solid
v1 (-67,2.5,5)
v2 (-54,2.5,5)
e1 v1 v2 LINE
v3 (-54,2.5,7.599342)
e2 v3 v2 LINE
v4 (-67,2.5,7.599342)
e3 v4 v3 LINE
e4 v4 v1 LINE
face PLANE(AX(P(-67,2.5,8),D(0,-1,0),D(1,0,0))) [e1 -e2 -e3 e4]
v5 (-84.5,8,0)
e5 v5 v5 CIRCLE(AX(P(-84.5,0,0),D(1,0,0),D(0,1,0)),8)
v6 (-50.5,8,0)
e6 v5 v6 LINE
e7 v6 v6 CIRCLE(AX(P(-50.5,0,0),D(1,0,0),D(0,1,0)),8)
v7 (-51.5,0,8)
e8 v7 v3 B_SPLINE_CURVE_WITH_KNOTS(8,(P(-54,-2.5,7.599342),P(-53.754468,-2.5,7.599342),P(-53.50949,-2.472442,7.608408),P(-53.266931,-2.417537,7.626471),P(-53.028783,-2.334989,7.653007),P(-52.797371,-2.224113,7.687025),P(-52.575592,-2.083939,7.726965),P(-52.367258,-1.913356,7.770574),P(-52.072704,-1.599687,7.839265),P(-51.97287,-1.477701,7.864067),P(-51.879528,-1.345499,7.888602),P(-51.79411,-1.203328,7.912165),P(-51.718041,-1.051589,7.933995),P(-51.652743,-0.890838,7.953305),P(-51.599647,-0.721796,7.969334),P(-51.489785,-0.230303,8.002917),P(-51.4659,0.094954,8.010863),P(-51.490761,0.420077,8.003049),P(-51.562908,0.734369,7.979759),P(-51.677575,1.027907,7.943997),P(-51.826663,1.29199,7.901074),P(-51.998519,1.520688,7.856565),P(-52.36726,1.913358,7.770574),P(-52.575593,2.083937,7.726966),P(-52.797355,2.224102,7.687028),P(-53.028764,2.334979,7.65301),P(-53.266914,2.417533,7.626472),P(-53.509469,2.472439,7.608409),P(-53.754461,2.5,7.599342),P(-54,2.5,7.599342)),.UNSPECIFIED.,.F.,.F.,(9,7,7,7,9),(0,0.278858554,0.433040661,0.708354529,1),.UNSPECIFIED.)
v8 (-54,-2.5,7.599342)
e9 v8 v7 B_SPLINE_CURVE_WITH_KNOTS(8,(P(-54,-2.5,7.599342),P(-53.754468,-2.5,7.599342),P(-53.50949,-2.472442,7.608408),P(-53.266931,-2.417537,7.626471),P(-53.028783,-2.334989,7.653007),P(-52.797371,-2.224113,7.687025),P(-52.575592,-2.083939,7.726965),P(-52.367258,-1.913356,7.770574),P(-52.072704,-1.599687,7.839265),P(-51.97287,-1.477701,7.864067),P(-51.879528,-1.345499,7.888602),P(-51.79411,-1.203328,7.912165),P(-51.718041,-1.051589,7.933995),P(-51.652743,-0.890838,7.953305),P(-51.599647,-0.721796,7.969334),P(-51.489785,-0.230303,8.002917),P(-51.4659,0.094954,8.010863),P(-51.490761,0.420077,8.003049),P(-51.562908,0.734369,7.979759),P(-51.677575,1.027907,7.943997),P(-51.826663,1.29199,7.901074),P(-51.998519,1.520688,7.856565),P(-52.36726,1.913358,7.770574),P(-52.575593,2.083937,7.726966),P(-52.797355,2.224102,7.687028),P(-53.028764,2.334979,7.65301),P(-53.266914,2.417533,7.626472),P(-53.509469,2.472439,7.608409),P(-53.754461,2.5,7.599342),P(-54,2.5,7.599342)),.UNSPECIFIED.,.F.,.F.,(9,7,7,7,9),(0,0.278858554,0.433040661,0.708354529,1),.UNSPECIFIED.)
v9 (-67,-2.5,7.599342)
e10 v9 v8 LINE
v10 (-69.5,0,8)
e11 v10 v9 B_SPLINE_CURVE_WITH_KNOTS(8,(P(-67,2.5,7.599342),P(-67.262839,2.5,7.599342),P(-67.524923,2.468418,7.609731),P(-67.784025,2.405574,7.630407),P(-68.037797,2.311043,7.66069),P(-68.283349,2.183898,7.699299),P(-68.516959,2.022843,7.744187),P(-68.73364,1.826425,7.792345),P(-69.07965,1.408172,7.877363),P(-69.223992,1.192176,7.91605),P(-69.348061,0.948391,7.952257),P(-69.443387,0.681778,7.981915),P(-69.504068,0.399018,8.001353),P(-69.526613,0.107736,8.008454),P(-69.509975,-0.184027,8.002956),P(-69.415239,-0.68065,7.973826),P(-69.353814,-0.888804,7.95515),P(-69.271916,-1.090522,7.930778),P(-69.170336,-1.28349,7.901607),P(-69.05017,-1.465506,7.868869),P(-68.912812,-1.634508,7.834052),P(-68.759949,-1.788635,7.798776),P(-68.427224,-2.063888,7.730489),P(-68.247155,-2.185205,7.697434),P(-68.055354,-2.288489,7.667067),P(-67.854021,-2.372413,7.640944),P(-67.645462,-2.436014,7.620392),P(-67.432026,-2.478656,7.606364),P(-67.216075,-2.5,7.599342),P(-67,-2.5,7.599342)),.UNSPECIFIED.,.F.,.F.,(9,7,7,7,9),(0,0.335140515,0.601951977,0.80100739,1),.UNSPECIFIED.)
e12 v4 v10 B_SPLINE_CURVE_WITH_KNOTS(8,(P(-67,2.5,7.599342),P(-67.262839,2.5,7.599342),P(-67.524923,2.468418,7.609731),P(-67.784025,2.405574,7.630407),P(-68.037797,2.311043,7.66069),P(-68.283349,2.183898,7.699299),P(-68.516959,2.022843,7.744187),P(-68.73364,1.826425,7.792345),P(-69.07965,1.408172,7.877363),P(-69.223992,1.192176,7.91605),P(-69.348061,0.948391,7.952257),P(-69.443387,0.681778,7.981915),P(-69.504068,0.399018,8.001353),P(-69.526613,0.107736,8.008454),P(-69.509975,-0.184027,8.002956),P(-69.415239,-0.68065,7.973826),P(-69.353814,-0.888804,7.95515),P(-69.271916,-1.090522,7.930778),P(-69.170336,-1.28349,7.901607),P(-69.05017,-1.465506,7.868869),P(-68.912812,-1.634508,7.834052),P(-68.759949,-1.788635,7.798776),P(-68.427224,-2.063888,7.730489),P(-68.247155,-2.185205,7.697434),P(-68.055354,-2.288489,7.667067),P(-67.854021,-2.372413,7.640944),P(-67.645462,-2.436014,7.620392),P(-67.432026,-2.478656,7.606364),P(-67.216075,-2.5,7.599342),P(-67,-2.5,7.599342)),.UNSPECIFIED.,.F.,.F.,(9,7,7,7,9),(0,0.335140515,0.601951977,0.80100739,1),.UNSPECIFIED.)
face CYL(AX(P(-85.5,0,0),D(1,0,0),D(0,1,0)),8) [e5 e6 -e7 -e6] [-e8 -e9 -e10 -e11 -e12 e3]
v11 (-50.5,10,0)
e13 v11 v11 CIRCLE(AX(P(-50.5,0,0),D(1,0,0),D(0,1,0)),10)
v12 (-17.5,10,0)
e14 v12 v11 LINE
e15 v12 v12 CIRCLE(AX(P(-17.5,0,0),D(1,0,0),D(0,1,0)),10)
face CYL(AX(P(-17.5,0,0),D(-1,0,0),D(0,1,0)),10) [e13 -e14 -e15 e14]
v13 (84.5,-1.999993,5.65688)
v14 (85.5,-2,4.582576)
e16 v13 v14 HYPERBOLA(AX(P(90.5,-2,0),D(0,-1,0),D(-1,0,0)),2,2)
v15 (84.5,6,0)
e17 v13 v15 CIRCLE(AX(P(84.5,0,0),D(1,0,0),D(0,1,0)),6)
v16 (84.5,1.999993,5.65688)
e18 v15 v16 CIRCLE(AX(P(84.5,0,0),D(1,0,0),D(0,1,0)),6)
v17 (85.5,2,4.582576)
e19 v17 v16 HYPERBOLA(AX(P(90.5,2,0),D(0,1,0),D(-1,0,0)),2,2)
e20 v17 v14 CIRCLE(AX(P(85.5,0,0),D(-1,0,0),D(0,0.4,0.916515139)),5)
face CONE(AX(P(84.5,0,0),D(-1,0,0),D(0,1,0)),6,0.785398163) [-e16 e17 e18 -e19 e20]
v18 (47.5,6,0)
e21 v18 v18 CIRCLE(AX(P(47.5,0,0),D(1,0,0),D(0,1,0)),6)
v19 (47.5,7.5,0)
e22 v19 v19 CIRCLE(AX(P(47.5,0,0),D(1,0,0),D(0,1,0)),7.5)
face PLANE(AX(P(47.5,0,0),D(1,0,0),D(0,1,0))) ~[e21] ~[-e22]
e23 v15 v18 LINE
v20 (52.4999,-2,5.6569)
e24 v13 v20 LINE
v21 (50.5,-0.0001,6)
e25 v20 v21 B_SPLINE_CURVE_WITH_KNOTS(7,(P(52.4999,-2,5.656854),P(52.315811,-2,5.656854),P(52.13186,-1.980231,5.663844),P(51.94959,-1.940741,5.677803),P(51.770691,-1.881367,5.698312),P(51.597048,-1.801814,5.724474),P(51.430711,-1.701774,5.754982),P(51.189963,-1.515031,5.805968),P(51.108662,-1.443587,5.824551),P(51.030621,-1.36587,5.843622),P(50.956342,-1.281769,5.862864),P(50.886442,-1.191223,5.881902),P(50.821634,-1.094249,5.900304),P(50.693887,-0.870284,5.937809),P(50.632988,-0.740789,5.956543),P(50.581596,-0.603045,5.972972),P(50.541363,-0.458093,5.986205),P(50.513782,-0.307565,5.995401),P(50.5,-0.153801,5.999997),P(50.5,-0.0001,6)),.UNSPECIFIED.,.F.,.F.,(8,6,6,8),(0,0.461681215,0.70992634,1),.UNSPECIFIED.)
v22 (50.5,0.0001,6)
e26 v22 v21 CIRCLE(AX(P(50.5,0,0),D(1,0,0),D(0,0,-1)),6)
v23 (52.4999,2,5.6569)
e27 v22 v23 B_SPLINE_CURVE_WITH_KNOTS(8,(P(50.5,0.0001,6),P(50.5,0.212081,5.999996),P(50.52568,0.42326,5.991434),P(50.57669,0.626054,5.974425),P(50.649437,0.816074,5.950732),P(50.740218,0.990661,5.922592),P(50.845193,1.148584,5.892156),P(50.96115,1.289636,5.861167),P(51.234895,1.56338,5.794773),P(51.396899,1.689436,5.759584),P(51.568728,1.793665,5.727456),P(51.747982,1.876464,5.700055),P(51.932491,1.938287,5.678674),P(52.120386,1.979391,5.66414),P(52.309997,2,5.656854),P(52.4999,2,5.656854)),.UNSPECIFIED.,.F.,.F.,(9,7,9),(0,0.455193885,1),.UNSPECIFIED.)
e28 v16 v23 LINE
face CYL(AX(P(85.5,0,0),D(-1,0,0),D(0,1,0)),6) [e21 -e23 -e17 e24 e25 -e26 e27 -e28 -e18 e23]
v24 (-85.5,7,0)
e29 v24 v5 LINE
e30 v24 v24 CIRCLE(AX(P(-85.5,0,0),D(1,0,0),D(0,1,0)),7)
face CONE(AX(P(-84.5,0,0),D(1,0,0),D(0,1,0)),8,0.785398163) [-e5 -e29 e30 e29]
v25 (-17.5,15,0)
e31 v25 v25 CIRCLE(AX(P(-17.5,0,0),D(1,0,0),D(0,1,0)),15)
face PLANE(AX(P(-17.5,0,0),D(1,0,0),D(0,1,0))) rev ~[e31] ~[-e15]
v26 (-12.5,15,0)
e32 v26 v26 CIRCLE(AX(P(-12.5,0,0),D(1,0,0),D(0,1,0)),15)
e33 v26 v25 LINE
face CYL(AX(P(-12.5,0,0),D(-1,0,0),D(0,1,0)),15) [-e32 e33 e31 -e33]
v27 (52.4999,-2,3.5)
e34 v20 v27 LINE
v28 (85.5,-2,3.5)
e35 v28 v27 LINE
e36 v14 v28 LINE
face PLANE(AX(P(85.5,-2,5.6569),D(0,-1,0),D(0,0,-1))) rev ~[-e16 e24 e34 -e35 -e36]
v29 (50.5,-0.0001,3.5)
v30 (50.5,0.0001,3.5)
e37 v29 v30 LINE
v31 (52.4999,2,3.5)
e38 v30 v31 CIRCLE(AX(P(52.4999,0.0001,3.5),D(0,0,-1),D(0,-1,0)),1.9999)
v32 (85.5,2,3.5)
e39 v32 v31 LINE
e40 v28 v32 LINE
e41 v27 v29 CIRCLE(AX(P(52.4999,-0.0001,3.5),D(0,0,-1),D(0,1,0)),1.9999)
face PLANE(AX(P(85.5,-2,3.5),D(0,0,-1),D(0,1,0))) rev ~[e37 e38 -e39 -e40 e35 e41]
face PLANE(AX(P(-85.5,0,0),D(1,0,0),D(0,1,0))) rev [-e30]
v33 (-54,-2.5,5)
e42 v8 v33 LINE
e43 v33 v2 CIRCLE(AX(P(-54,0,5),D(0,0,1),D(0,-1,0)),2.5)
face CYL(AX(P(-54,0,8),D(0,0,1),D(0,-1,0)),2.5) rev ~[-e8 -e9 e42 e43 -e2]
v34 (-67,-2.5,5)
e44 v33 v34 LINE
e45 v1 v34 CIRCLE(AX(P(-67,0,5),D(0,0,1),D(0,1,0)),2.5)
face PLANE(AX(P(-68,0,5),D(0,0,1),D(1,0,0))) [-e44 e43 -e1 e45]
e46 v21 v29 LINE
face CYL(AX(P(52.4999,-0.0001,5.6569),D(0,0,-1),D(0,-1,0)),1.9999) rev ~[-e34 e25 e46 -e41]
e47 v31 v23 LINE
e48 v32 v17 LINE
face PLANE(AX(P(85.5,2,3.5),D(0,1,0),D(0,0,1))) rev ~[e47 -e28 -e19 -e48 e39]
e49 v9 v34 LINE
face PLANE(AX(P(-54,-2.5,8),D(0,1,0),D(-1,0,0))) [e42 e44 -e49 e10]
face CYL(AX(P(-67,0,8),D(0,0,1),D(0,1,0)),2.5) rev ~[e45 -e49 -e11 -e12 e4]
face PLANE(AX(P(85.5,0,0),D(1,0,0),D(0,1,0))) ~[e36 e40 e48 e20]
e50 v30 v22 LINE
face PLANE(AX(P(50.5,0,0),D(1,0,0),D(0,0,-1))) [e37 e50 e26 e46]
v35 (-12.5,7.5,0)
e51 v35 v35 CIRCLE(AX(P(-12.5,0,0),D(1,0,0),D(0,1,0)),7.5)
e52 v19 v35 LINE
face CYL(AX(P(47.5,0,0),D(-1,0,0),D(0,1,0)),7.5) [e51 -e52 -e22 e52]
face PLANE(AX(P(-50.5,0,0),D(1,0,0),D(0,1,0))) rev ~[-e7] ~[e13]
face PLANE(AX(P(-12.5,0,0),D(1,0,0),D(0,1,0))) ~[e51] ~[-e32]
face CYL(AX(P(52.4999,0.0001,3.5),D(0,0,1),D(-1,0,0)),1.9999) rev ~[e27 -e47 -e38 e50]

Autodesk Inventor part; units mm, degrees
ref_plane "YZ Plane" through (0, 0, 0) normal (1, 0, 0) x (0, 1, 0)
ref_plane "XZ Plane" through (0, 0, 0) normal (0, 1, 0) x (-1, 0, 0)
sketch "Sketch1" plane through (0, 0, 0) normal (0, 0, 1) x (1, 0, 0)
  line L0 (-85.5, 0) -> (85.5, 0)
  line L1 (85.5, 0) -> (85.5, 6)
  line L2 (85.5, 6) -> (47.5, 6)
  line L3 (47.5, 6) -> (47.5, 7.5)
  line L4 (47.5, 7.5) -> (-12.5, 7.5)
  line L5 (-12.5, 7.5) -> (-12.5, 15)
  line L6 (-12.5, 15) -> (-17.5, 15)
  line L7 (-17.5, 15) -> (-17.5, 10)
  line L8 (-17.5, 10) -> (-50.5, 10)
  line L9 (-85.5, 0) -> (-85.5, 8)
  line L10 (-85.5, 8) -> (-50.5, 8)
  line L11 (-50.5, 10) -> (-50.5, 8)
  point P0 (0, 0)
  point P1 (0, 0)
  dimension "d8" = 12
  dimension "d9" = 15
  dimension "d10" = 30
  dimension "d11" = 20
  dimension "d12" = 98
  dimension "d13" = 5
  dimension "d14" = 60
  dimension "d15" = 33
  dimension "d16" = 16
  dimension "d43" = 68
revolve "Revolution1" add sketch "Sketch1" angle 360 about axis through (-85.5, 0, 0) along (1, 0, 0)
thread "Thread1" size "M12x1.5" class "6g" standard "ISO Metric profile" length 10
chamfer "Chamfer1" distance 1 angle 45 2 edges at (85.5, -6, 0) (-85.5, -8, 0)
sketch "Sketch4" plane through (85.5, 0, 0) normal (1, 0, 0) x (0, 0, -1)
  circle A0 centre (0, 0) radius 6 projected
  line L0 (-5.6569, -2) -> (-3.5, -2)
  line L1 (-3.5, -2) -> (-3.5, 2)
  line L2 (-3.5, 2) -> (-5.6569, 2)
  point P0 (0, 0)
  dimension "d35" = 9.5
  dimension "d36" = 4
extrude "Extrusion3" cut sketch "Sketch4" against normal blind 35 contours L2 L1 L0 A0 picked at (-4.3205, -0.2261)
full round fillet "Full Round Fillet1" first side at (73.5, -2, 4.219) centre faces at (50.5, 0.2261, 4.3205) second side at (73.5, 2, 4.219)
thread "Thread2" size "M16x2" class "6g" standard "ANSI Metric M Profile" length 17
ref_plane "Work Plane2" through (-68, 0, 8) normal (0, 0, 1) x (1, 0, 0)
sketch "Sketch3" plane through (-68, 0, 8) normal (0, 0, 1) x (1, 0, 0)
  line L0 (14, -2.5) -> (1, -2.5)
  arc A0 (1, 2.5) -> (1, -2.5) centre (1, 0) ccw
  line L1 (1, 2.5) -> (14, 2.5)
  arc A1 (14, -2.5) -> (14, 2.5) centre (14, 0) ccw
  line L2 (-51.7, 0) -> (187.7, 0) projected
  line L3 (-17.5, -7) -> (-17.5, 7) projected
  point P0 (68, 0)
  point P1 (16.5, 0)
  point P2 (-1.5, 0)
  dimension "d40" = 18
  dimension "d41" = 5
  dimension "d42" = 16
extrude "Extrusion2" cut sketch "Sketch3" against normal blind 3
properties material "Steel, Alloy"
